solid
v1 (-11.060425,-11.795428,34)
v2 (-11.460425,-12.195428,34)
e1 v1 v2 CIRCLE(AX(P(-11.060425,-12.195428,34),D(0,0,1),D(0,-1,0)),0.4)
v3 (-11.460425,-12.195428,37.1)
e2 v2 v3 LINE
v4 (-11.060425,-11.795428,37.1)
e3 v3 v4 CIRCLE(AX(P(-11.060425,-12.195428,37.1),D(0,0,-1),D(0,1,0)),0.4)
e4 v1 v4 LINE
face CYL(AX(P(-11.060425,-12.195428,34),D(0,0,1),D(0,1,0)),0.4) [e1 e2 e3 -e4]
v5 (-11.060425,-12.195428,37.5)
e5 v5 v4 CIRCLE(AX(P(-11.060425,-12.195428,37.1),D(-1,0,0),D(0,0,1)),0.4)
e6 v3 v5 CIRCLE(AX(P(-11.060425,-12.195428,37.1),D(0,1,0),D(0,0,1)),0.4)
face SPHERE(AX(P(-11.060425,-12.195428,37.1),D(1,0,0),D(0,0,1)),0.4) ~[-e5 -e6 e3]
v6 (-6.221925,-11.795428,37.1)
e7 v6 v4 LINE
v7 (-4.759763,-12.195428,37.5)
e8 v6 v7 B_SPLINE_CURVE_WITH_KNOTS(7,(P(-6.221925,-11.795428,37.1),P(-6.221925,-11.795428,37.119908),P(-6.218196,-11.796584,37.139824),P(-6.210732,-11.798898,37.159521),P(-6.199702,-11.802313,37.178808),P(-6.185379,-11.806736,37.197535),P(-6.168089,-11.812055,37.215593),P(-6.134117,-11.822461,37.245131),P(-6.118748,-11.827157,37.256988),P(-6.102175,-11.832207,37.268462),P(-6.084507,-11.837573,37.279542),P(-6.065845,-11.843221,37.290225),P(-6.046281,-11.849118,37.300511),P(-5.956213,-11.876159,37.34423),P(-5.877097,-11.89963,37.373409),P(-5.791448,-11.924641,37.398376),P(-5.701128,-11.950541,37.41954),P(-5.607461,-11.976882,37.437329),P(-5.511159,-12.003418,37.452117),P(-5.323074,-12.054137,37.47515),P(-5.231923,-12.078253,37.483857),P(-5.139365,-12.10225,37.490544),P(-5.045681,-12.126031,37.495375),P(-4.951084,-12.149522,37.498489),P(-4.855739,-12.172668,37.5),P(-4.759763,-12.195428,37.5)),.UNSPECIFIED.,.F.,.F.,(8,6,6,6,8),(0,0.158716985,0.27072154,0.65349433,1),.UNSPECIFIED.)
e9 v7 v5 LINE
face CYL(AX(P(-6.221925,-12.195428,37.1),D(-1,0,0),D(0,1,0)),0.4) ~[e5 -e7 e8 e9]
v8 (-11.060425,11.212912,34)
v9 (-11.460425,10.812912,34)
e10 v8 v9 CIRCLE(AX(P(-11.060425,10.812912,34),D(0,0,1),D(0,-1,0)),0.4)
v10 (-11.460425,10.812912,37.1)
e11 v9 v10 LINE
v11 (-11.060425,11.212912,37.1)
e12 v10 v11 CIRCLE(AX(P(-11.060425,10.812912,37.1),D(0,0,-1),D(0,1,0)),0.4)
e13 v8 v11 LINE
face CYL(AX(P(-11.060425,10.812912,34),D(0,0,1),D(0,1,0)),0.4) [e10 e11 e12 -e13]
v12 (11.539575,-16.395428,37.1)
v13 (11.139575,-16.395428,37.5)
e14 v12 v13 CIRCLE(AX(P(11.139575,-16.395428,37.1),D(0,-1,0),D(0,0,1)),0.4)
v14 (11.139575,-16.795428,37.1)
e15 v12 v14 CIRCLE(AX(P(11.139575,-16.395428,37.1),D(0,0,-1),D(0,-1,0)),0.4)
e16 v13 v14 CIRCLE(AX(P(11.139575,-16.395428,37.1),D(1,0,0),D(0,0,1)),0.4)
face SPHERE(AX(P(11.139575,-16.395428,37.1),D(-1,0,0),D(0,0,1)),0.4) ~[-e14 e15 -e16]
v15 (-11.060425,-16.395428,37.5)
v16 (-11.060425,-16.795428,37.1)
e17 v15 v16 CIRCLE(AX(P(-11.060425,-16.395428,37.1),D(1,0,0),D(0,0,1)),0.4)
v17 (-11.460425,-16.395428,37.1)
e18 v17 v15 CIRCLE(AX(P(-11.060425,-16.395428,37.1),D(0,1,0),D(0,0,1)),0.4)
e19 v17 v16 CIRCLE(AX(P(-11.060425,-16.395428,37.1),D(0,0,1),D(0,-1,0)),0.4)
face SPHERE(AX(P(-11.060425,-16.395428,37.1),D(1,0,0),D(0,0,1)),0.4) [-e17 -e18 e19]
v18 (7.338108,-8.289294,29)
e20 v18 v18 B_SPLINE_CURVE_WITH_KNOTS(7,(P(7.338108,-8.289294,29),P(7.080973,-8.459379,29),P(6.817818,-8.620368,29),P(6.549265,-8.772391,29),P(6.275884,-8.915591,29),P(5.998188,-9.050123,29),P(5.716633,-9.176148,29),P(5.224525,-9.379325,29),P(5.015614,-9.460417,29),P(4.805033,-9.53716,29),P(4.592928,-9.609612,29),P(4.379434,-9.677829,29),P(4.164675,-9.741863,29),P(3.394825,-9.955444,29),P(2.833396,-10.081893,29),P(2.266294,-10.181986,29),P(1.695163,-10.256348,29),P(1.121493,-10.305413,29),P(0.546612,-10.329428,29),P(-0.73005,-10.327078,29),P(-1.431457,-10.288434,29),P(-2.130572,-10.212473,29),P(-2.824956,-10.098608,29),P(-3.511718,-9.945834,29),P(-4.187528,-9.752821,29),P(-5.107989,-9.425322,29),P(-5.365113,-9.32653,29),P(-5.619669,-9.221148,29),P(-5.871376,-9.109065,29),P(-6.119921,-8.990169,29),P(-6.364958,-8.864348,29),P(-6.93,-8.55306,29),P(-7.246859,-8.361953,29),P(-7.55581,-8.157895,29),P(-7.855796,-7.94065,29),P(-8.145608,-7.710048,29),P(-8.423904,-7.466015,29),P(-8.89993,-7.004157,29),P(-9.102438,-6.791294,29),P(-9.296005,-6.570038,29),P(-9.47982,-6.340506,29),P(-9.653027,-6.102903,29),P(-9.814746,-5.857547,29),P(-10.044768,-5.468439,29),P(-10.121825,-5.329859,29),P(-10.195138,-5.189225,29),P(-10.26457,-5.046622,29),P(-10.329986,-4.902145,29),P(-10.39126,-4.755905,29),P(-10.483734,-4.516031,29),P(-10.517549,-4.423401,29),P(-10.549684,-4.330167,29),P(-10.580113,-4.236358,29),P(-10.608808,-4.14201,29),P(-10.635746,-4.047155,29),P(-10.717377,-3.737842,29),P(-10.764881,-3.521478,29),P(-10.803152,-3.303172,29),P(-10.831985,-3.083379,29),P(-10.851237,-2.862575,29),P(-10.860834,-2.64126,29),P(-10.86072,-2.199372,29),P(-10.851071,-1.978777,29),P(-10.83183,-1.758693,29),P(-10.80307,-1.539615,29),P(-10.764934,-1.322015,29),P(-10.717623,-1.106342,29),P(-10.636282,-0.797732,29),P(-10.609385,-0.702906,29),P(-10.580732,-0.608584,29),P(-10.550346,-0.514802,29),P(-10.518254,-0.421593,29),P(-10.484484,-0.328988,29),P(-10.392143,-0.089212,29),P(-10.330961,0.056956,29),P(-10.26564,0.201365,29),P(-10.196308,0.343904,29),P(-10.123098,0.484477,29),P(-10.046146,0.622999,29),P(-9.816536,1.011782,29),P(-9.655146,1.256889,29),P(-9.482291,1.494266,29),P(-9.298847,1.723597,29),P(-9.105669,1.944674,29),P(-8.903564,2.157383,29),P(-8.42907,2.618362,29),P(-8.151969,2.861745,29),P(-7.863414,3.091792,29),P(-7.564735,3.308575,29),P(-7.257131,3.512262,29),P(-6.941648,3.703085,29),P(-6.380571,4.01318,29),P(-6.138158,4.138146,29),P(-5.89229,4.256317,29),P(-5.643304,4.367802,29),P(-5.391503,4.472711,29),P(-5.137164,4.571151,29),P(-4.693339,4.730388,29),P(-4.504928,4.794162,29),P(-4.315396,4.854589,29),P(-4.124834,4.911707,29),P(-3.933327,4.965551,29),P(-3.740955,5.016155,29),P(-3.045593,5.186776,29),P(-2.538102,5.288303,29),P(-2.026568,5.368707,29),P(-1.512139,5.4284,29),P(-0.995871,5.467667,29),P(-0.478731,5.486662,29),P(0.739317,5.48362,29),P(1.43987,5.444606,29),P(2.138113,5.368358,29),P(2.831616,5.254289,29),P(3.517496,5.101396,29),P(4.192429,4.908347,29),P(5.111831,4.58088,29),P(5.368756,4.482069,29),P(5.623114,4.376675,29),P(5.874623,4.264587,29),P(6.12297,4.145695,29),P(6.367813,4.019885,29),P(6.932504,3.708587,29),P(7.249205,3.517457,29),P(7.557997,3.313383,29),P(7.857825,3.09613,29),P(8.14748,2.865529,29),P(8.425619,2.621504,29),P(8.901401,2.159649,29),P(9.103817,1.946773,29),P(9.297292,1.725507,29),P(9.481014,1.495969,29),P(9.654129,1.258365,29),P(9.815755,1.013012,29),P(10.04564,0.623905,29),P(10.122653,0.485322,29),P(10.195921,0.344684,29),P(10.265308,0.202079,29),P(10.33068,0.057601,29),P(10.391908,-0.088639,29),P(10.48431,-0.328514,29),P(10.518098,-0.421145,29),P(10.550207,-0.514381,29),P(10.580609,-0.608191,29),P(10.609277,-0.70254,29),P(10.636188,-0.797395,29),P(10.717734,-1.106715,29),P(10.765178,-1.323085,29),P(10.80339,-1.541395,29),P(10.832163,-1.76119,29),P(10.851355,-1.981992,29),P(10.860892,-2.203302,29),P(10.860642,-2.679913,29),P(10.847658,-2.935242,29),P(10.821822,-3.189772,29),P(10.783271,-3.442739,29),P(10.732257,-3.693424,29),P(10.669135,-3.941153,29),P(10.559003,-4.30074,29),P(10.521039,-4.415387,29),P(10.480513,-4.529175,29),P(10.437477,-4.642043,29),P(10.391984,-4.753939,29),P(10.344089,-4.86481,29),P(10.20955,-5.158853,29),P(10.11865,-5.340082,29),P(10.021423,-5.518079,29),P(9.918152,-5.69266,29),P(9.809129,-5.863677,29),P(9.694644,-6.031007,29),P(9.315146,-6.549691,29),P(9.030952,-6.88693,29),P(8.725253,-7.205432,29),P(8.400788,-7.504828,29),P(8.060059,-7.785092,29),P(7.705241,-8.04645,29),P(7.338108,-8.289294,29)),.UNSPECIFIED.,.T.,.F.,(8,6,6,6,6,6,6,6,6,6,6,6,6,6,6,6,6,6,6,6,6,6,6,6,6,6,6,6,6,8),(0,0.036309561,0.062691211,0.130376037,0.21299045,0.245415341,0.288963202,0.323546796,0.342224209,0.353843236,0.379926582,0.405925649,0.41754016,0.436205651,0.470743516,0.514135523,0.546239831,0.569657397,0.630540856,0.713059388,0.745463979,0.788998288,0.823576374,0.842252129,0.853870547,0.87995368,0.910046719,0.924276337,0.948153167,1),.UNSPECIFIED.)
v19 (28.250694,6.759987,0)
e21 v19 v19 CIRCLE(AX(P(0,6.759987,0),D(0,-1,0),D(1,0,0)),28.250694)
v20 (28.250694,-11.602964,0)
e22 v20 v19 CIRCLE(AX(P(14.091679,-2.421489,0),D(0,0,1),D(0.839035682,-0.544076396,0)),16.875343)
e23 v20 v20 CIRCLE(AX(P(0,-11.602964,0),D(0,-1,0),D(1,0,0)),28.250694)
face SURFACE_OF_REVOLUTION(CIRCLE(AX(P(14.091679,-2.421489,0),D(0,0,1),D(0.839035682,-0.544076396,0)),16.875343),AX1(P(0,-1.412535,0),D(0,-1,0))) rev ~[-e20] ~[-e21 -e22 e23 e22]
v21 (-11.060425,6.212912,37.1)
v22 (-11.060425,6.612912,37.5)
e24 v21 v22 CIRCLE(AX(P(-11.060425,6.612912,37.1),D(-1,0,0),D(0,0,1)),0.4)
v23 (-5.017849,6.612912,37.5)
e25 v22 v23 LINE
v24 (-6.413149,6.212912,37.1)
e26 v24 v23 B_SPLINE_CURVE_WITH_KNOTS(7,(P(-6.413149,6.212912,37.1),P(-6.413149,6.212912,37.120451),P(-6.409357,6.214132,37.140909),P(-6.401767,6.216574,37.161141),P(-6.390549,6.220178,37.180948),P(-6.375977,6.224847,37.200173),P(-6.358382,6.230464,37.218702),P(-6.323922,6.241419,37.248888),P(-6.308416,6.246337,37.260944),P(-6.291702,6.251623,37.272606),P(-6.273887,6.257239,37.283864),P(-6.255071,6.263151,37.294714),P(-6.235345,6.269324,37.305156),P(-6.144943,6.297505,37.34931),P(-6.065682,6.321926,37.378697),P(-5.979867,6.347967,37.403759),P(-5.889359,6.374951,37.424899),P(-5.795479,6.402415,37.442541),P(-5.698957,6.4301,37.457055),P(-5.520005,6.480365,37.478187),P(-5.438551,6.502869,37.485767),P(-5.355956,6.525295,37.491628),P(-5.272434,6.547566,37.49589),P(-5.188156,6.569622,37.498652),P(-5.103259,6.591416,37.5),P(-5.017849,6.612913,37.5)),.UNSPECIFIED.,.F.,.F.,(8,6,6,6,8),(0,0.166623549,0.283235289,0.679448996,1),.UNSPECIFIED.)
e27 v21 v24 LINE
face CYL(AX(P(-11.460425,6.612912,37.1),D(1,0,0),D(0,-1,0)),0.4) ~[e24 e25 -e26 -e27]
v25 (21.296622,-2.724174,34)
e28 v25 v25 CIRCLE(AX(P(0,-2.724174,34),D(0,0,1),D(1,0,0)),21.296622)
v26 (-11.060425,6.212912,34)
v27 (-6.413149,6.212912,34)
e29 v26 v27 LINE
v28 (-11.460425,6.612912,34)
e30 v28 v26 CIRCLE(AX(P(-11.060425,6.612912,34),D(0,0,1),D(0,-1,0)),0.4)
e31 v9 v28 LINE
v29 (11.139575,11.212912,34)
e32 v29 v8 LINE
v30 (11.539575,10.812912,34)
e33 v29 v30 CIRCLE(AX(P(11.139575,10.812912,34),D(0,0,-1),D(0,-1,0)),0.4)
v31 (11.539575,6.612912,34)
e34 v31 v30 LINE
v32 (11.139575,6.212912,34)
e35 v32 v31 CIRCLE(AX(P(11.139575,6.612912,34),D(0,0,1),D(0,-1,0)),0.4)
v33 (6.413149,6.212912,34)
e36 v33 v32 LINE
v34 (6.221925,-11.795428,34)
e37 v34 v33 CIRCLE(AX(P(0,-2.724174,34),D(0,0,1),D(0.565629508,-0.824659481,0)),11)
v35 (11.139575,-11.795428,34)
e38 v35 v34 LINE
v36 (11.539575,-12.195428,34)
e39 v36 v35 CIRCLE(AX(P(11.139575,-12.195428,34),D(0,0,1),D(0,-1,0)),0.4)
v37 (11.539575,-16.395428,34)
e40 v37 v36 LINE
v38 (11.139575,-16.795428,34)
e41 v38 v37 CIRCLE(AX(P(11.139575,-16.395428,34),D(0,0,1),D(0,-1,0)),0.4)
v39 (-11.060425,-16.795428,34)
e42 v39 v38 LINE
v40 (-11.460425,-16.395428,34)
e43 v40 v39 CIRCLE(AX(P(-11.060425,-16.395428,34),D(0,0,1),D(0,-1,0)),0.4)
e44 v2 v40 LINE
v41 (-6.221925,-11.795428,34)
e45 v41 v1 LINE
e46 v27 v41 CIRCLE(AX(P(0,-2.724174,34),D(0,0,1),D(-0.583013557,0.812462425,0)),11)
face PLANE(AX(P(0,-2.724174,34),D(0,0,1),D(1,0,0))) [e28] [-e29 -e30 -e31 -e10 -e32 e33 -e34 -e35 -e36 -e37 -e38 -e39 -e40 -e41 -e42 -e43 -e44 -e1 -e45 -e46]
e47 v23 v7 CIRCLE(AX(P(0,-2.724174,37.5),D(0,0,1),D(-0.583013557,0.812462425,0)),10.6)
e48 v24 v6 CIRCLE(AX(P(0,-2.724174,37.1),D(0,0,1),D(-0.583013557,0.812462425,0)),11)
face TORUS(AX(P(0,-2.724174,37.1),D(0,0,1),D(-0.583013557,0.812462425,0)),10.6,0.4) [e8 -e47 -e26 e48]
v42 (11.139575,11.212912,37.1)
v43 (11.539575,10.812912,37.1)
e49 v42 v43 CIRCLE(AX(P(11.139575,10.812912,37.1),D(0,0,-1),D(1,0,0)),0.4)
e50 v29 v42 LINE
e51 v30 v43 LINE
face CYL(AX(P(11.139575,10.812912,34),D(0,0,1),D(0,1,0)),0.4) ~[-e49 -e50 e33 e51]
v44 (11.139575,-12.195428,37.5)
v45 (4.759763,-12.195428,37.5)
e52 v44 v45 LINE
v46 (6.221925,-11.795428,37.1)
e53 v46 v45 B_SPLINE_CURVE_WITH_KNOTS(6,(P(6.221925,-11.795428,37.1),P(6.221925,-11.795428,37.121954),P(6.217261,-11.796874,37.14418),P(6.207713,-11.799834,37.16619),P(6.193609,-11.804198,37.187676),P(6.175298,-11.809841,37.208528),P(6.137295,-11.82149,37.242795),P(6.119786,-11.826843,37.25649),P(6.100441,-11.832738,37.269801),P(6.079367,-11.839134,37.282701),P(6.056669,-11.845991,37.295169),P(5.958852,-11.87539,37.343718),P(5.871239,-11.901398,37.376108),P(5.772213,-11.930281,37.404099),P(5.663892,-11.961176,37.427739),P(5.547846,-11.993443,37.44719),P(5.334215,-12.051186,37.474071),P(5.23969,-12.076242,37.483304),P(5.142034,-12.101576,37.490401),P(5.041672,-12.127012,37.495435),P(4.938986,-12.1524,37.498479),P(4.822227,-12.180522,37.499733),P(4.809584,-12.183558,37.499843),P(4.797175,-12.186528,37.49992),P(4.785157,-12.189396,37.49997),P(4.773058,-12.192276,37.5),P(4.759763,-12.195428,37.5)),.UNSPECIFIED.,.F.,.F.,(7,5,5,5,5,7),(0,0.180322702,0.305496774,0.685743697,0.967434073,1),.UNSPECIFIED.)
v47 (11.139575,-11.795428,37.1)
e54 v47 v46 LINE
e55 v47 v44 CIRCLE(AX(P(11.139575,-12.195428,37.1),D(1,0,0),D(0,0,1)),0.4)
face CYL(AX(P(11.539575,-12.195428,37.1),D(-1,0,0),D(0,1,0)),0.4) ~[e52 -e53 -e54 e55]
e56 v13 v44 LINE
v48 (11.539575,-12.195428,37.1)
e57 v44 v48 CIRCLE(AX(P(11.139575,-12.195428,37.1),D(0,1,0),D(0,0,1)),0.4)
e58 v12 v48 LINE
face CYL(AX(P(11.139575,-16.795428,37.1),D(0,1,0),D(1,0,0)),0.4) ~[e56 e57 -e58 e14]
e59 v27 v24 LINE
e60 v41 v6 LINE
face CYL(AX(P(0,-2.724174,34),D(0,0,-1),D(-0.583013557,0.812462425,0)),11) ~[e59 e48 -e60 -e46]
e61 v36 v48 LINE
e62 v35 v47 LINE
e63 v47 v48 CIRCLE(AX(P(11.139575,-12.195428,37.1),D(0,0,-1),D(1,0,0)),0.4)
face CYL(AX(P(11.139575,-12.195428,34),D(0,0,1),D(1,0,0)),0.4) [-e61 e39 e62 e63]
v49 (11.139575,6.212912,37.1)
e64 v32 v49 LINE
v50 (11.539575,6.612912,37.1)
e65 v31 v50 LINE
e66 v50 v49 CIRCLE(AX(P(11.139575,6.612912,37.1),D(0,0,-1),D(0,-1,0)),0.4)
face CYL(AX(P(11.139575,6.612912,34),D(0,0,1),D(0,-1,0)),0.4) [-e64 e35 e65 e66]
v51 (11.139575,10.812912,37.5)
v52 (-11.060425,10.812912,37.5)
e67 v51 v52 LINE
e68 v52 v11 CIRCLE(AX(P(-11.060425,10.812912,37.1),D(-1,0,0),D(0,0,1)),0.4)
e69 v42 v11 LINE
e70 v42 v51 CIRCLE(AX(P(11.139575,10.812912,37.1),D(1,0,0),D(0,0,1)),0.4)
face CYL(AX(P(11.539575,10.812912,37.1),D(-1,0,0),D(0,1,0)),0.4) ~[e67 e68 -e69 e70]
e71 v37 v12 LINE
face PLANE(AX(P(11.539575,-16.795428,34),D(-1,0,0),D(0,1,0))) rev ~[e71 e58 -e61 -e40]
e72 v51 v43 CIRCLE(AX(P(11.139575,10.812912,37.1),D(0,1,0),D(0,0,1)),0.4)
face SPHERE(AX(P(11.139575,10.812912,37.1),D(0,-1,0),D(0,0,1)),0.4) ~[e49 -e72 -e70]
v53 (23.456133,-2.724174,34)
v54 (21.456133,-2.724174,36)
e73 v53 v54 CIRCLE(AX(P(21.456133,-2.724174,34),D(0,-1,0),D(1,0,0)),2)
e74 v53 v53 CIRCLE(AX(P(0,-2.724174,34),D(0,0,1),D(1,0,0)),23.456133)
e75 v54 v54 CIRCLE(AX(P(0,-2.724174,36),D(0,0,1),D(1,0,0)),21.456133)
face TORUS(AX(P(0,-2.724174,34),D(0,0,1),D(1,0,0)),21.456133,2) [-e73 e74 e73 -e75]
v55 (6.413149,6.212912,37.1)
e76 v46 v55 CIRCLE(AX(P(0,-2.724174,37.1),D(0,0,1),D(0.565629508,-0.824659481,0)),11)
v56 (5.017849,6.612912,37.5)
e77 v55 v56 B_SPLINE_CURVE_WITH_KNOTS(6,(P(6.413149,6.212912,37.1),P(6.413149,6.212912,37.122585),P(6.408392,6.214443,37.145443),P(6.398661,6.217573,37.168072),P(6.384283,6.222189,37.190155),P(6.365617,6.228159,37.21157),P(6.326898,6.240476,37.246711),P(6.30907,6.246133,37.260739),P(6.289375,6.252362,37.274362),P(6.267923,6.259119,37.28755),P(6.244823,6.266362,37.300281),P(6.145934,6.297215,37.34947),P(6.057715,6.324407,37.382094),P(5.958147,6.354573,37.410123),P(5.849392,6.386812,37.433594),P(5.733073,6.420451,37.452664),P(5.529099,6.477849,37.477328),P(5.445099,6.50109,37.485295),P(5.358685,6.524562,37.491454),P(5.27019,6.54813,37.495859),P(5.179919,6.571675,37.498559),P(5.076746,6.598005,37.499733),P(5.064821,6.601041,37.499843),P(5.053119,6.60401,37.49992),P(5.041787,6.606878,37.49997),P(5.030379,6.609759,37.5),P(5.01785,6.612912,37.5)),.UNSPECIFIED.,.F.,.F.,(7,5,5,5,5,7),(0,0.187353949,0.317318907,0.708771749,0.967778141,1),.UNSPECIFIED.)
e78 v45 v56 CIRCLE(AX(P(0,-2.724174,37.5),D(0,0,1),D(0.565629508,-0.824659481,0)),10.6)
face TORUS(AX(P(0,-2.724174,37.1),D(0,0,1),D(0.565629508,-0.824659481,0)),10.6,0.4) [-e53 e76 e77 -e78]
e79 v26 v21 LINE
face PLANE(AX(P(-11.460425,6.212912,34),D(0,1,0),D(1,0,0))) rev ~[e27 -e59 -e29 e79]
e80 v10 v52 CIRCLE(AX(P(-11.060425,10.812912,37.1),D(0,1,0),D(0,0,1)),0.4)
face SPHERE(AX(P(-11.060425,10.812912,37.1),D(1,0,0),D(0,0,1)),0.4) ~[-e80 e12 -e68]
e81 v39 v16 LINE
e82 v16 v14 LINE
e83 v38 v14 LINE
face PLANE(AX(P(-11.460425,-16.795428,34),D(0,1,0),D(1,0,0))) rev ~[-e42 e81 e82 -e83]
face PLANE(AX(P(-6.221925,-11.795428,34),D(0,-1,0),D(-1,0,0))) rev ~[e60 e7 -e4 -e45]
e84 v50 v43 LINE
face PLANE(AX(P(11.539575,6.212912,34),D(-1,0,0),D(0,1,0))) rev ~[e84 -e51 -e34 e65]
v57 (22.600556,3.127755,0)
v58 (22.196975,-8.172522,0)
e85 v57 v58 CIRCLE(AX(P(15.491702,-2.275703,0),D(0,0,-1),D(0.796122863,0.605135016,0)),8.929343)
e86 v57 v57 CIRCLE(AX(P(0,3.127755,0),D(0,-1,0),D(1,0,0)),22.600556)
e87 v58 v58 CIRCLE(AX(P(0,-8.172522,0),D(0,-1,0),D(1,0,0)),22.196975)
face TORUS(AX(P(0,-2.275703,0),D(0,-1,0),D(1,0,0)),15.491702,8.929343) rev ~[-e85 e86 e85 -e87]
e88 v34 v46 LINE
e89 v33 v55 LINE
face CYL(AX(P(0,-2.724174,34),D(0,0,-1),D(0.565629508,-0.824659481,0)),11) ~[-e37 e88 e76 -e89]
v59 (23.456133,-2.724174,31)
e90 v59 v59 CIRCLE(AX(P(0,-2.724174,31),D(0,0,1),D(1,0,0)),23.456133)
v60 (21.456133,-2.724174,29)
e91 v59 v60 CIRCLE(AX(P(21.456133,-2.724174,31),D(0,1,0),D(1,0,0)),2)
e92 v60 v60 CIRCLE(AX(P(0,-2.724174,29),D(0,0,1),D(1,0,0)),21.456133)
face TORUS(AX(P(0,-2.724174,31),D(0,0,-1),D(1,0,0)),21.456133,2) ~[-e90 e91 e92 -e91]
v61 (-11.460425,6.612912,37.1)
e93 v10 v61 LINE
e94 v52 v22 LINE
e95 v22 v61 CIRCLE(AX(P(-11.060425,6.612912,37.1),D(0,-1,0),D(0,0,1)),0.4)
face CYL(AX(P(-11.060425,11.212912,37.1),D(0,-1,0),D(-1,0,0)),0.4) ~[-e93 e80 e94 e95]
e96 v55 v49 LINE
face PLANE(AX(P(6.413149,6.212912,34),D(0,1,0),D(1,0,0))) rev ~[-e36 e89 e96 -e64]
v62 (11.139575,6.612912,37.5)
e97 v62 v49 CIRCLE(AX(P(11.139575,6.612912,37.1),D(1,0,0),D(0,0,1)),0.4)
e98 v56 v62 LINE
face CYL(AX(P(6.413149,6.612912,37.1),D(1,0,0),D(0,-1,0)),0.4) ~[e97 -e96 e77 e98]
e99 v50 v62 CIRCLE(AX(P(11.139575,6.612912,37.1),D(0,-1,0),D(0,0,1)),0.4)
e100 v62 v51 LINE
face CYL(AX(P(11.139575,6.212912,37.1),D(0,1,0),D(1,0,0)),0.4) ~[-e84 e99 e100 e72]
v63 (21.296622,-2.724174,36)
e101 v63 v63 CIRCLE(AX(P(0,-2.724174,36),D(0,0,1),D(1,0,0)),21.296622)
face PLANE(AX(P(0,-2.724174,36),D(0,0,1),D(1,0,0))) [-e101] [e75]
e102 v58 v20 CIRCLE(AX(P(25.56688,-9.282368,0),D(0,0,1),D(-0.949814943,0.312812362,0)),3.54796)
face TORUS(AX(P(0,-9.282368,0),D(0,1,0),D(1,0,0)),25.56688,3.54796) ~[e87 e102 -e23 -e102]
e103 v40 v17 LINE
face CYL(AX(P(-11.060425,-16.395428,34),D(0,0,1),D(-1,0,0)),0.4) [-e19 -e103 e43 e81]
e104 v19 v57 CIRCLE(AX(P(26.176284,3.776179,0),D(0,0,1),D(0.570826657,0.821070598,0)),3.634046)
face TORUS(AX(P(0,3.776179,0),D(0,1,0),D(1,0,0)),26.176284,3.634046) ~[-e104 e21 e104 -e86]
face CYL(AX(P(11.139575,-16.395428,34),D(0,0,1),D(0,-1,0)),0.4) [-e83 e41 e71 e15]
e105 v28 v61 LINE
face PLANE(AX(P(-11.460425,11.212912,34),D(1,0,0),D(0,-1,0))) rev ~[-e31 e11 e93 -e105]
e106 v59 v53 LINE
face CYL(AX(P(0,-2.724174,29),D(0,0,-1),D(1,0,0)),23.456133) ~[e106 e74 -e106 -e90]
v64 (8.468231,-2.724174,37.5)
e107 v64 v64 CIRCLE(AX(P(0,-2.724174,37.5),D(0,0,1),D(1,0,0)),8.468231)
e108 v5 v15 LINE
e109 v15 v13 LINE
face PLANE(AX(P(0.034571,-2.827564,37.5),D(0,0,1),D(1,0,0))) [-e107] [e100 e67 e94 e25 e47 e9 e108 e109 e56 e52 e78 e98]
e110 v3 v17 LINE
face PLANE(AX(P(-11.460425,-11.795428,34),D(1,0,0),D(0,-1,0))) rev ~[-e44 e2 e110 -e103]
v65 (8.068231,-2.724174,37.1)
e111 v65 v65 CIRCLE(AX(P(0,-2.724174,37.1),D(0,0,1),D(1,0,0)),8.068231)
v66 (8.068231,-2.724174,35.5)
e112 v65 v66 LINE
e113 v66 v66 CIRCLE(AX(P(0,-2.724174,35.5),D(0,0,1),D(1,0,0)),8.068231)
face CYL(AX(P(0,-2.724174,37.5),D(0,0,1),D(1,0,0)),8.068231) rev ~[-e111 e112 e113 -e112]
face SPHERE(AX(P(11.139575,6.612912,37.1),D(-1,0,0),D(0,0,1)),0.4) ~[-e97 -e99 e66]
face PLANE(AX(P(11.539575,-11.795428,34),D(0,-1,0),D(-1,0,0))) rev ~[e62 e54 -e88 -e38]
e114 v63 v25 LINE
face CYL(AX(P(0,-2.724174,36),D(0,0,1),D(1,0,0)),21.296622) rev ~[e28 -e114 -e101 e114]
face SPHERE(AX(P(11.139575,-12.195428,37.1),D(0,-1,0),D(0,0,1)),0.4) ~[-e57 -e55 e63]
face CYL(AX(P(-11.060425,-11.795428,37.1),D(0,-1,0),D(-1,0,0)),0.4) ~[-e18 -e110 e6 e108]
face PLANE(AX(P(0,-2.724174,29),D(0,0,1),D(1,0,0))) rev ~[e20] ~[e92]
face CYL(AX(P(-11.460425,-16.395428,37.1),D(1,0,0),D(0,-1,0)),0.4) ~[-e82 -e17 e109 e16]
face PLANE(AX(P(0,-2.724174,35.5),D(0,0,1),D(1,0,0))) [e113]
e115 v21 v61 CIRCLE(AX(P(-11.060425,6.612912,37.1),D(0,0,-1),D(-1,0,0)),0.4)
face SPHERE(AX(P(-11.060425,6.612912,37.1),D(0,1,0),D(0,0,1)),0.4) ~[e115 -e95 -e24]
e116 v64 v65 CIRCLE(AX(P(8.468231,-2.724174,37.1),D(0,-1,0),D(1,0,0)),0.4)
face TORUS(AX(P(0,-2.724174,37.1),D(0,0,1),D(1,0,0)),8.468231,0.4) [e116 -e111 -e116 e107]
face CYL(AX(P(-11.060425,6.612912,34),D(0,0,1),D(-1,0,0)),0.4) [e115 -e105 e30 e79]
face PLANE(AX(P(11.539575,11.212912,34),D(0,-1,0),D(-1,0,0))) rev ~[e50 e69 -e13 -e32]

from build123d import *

# Parameters (mm, degrees)
F3_R      = 23.4561334986
F4_DEPTH  = 7
F5_R      = 21.296621693
F6_DEPTH  = 2
F8_DEPTH  = 3.5
F9_R      = 8.0682313044
F10_DEPTH = 2
F11_R     = 2
F12_R     = 0.4


with BuildPart() as f1:
    # F0 (on Top) → F1 (revolve)
    with BuildSketch(Plane.XY):
        with BuildLine():
            ThreePointArc((22.6005557925, 3.1277553644), (24.4153553843, -2.5944045172), (22.1969746053, -8.172522299))
            ThreePointArc((22.1969746053, -8.172522299), (23.8176910174, -12.3691722612), (28.2506942749, -11.6029642522))
            ThreePointArc((28.2506942749, -11.6029642522), (30.9670223358, -2.4214885198), (28.2506942749, 6.7599872127))
            ThreePointArc((28.2506942749, 6.7599872127), (24.2111464827, 6.8330601629), (22.6005557925, 3.1277553644))
        make_face()
    revolve(axis=Axis((0, -1.4125350863, 0), (0, -1, 0)))

    # F3 (on offset) → F4 (join)
    with BuildSketch(Plane.XY.offset(29)):
        with Locations((0, -2.7241741773)):
            Circle(F3_R)
    extrude(amount=F4_DEPTH)

    # F5 (on face) → F6 (cut)
    with BuildSketch(Plane.XY.offset(36)):
        with Locations((0, -2.7241741773)):
            Circle(F5_R)
    extrude(amount=-F6_DEPTH, mode=Mode.SUBTRACT)

    # F7 (on face) → F8 (join)
    with BuildSketch(Plane.XY.offset(34)):
        with BuildLine():
            Line((11.5395749398, 11.2129124999), (-11.4604250602, 11.2129124999))
            Line((-11.4604250602, 11.2129124999), (-11.4604250602, 6.2129124999))
            Line((-11.4604250602, 6.2129124999), (-6.413149127, 6.2129124999))
            ThreePointArc((-6.413149127, 6.2129124999), (-10.9993798942, -2.8409729078), (-6.2219245866, -11.7954284698))
            Line((-6.2219245866, -11.7954284698), (-11.4604250602, -11.7954284698))
            Line((-11.4604250602, -11.7954284698), (-11.4604250602, -16.7954284698))
            Line((-11.4604250602, -16.7954284698), (11.5395749398, -16.7954284698))
            Line((11.5395749398, -16.7954284698), (11.5395749398, -11.7954284698))
            Line((11.5395749398, -11.7954284698), (6.2219245866, -11.7954284698))
            ThreePointArc((6.2219245866, -11.7954284698), (10.9993798942, -2.8409729078), (6.413149127, 6.2129124999))
            Line((6.413149127, 6.2129124999), (11.5395749398, 6.2129124999))
            Line((11.5395749398, 6.2129124999), (11.5395749398, 11.2129124999))
        make_face()
    extrude(amount=F8_DEPTH)

    # F9 (on face) → F10 (cut)
    with BuildSketch(Plane.XY.offset(37.5)):
        with Locations((0, -2.7241741773)):
            Circle(F9_R)
    extrude(amount=-F10_DEPTH, mode=Mode.SUBTRACT)

    # F11
    f11_edges = [f1.edges().sort_by_distance(p)[0] for p in [
        (-23.456133, -2.724174, 29),
        (-23.456133, -2.724174, 36),
    ]]
    fillet(f11_edges, radius=F11_R)

    # F12
    f12_edges = [f1.edges().sort_by_distance(p)[0] for p in [
        (0.039575, -16.795428, 37.5),
        (11.539575, -14.295428, 37.5),
        (8.88075, -11.795428, 37.5),
        (10.99938, -2.840973, 37.5),
        (8.976362, 6.212912, 37.5),
        (11.539575, 8.712912, 37.5),
        (0.039575, 11.212912, 37.5),
        (-11.460425, 8.712912, 37.5),
        (-8.936787, 6.212912, 37.5),
        (-10.99938, -2.840973, 37.5),
        (-8.841175, -11.795428, 37.5),
        (-8.068231, -2.724174, 37.5),
        (-11.460425, -14.295428, 37.5),
        (-11.460425, -16.795428, 35.75),
        (-11.460425, -11.795428, 35.75),
        (-11.460425, 6.212912, 35.75),
        (-11.460425, 11.212912, 35.75),
        (11.539575, 11.212912, 35.75),
        (11.539575, 6.212912, 35.75),
        (11.539575, -16.795428, 35.75),
        (11.539575, -11.795428, 35.75),
    ]]
    fillet(f12_edges, radius=F12_R)


solid = f1.part
